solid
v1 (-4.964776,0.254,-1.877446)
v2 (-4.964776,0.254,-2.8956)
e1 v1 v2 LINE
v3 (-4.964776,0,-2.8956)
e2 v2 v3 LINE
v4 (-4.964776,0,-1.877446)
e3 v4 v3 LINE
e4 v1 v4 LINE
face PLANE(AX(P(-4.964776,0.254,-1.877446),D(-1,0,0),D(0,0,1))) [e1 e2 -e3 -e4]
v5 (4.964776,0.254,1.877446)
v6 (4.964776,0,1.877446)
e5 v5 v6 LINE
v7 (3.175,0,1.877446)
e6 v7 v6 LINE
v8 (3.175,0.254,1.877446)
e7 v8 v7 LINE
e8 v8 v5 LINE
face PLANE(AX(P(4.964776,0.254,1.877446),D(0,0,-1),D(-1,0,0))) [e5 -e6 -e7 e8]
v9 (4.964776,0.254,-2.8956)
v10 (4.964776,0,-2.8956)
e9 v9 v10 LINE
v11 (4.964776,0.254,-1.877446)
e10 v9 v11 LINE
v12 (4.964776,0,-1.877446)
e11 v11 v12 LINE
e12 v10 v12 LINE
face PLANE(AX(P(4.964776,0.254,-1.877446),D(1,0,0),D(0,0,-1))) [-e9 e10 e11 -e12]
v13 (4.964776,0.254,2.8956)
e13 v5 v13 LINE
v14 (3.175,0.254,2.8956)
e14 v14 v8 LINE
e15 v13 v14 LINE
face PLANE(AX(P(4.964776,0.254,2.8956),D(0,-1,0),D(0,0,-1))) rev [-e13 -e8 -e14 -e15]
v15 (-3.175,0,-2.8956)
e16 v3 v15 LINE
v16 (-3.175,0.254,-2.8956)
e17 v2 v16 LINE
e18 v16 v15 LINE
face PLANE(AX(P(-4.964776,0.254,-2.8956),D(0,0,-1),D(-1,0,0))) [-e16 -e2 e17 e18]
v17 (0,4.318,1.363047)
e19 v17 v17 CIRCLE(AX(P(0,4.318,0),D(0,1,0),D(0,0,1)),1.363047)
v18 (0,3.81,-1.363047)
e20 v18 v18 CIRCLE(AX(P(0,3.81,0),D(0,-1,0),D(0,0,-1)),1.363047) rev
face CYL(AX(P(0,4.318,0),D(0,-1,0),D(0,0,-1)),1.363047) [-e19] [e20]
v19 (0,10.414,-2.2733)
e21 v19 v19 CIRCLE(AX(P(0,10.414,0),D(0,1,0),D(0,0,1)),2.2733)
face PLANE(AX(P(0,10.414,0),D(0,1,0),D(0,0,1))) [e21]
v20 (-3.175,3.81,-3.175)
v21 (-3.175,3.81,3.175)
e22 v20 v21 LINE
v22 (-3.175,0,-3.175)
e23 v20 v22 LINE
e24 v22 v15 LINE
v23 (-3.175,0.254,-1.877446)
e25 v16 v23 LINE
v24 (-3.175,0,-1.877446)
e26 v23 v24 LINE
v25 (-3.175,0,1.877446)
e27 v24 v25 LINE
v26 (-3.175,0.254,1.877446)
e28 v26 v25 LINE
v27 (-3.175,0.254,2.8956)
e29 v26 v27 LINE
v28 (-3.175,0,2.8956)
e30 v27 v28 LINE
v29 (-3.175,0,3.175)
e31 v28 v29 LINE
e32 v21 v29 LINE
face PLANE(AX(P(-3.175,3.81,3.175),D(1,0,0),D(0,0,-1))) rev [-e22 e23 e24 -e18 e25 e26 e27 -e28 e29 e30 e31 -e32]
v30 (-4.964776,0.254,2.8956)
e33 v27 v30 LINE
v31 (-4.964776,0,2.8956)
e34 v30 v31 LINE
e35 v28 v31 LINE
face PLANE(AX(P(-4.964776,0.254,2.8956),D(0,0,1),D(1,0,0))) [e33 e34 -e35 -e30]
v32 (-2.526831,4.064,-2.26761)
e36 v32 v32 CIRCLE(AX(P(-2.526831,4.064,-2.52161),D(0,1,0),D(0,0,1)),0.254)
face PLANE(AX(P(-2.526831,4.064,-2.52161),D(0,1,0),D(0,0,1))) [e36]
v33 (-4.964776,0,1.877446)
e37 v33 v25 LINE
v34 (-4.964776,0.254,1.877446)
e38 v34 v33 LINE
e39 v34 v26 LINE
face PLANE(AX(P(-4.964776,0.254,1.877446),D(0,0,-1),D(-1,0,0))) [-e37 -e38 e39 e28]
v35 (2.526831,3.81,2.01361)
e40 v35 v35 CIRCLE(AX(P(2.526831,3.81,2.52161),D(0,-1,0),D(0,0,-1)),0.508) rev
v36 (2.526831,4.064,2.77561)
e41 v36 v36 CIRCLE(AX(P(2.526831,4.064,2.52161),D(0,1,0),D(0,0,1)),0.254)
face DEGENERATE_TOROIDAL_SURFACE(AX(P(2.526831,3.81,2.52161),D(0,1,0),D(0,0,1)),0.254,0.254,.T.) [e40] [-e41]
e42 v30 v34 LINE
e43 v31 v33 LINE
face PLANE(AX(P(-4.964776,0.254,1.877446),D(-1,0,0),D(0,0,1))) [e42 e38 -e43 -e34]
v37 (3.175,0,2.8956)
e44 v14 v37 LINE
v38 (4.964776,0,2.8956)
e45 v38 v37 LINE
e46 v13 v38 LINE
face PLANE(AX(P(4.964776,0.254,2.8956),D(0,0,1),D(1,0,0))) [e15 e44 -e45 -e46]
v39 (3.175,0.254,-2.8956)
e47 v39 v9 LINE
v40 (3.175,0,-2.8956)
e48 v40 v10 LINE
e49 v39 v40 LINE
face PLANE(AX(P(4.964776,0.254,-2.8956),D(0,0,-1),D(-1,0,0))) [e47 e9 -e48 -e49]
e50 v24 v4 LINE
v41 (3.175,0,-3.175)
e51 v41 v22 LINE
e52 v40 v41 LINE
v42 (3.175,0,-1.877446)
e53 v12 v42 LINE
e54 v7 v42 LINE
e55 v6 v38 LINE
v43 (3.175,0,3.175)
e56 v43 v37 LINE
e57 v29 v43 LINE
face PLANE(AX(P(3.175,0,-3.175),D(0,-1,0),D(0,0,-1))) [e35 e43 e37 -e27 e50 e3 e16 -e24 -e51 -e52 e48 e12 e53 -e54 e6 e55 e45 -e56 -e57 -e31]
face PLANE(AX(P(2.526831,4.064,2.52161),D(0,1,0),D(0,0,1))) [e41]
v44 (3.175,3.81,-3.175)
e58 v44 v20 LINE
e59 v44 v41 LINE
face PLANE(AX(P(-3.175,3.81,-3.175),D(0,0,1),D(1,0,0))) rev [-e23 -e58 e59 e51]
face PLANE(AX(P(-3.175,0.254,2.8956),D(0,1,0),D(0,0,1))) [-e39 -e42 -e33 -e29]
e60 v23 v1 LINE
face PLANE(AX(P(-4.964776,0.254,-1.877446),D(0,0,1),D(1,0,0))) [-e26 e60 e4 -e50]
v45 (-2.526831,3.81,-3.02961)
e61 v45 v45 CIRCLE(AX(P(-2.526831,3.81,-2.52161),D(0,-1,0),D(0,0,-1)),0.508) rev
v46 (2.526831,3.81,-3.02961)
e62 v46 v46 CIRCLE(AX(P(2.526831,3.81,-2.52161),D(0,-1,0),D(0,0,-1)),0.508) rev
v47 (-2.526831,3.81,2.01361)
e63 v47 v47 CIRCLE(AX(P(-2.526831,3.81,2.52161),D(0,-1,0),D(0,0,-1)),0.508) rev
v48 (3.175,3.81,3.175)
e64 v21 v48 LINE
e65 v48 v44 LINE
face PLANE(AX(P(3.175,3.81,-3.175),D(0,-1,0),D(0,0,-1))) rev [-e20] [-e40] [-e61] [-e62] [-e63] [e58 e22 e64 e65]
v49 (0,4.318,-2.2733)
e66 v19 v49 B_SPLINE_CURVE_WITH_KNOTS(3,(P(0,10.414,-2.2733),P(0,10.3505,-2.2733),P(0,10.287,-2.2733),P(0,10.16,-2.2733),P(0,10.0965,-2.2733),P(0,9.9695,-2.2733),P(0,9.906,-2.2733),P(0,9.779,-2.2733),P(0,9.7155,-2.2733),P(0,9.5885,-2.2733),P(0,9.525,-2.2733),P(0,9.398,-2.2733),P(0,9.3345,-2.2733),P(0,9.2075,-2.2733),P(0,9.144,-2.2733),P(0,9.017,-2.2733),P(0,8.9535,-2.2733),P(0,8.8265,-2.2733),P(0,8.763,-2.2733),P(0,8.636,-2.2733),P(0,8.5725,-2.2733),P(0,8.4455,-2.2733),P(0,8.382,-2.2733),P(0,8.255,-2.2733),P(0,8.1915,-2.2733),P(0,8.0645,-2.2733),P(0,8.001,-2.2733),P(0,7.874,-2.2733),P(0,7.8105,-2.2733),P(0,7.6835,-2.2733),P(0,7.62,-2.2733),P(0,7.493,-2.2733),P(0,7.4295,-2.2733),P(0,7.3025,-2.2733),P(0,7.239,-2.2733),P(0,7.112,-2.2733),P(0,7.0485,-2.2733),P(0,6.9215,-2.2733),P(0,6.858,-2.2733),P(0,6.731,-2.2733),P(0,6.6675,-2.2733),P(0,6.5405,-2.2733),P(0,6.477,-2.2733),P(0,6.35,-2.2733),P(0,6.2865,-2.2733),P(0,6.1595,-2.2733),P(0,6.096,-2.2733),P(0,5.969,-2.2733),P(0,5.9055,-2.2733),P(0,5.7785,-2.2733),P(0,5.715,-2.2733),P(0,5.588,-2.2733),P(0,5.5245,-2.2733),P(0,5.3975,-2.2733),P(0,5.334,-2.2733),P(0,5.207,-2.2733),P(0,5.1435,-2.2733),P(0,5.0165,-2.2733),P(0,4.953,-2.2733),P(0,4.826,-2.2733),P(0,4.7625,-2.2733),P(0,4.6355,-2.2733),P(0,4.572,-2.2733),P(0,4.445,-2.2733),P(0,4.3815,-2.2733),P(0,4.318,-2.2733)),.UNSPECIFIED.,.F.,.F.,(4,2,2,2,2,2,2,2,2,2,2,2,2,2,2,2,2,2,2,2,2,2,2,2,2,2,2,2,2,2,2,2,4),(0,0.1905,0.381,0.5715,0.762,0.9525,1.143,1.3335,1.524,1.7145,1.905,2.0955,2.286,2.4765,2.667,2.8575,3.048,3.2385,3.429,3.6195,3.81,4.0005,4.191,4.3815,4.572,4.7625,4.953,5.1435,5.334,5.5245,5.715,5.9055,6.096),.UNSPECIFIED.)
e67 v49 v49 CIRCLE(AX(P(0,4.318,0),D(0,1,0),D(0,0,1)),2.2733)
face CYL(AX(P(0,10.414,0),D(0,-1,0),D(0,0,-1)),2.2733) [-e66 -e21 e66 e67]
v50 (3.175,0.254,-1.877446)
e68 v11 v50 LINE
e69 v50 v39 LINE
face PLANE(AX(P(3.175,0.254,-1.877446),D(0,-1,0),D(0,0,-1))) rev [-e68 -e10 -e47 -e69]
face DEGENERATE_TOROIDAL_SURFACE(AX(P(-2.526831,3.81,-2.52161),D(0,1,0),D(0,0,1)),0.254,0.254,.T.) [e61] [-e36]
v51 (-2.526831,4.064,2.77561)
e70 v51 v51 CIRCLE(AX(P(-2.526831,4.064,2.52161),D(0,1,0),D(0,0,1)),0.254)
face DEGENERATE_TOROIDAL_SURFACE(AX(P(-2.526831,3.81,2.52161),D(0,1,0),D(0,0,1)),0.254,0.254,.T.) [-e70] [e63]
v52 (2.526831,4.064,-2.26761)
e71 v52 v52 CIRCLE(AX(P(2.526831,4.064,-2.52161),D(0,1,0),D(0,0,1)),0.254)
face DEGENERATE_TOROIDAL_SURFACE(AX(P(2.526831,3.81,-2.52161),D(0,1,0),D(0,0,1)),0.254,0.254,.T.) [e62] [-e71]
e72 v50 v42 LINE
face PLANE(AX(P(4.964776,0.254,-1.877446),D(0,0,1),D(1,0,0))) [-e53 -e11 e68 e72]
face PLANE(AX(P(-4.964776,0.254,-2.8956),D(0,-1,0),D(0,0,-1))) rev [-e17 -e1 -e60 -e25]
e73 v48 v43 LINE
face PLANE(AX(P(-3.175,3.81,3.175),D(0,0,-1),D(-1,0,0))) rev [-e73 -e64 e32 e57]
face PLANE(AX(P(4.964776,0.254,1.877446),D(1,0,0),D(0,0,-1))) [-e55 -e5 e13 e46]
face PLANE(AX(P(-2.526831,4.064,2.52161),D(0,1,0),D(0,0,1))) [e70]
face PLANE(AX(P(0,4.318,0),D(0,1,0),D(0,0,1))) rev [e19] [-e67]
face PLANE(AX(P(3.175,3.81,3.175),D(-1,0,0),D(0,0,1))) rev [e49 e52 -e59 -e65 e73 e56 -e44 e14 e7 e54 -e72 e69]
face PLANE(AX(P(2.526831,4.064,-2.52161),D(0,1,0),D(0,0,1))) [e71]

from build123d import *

# Parameters (mm, degrees)
SKETCH1_W           = 6.35
SKETCH1_H           = 6.35
BOSS_EXTRUDE1_DEPTH = 3.81
SKETCH2_W           = 1.78977558
SKETCH2_H           = 1.018153585
BOSS_EXTRUDE2_DEPTH = 0.254
SKETCH3_R           = 0.508
BOSS_EXTRUDE3_DEPTH = 0.254
FILLET1_R           = 0.254
SKETCH4_R           = 1.363047184
BOSS_EXTRUDE4_DEPTH = 0.508
SKETCH5_R           = 2.2733
BOSS_EXTRUDE5_DEPTH = 6.096


with BuildPart() as part:
    # Sketch1 → Boss-Extrude1 (new body)
    with BuildSketch(Plane(origin=(0, 0, 0), x_dir=(1, 0, 0), z_dir=(0, 1, 0))):
        Rectangle(SKETCH1_W, SKETCH1_H)
    extrude(amount=BOSS_EXTRUDE1_DEPTH)

    # Sketch2 → Boss-Extrude2 (add)
    with BuildSketch(Plane.XZ):
        with Locations((-4.06988779, -2.386523208)):
            Rectangle(SKETCH2_W, SKETCH2_H)
        with Locations((-4.06988779, 2.386523208)):
            Rectangle(SKETCH2_W, SKETCH2_H)
        with Locations((4.06988779, 2.386523208)):
            Rectangle(SKETCH2_W, SKETCH2_H)
        with Locations((4.06988779, -2.386523208)):
            Rectangle(SKETCH2_W, SKETCH2_H)
    extrude(amount=-BOSS_EXTRUDE2_DEPTH)

    # Sketch3 → Boss-Extrude3 (add)
    with BuildSketch(Plane(origin=(0, 3.81, 0), x_dir=(-1, 0, 0), z_dir=(0, 1, 0))):
        with Locations(Location((2.526830598, -2.521609873, 0), (0, 0, 270))):
            Circle(SKETCH3_R)
        with Locations(Location((-2.526830598, -2.521609873, 0), (0, 0, 270))):
            Circle(SKETCH3_R)
        with Locations(Location((-2.526830598, 2.521609873, 0), (0, 0, 270))):
            Circle(SKETCH3_R)
        with Locations(Location((2.526830598, 2.521609873, 0), (0, 0, 270))):
            Circle(SKETCH3_R)
    extrude(amount=BOSS_EXTRUDE3_DEPTH)

    # Fillet1
    fillet1_edges = [part.edges().sort_by_distance(p)[0] for p in [
        (-2.526830598, 4.064, -2.013609873),
        (2.526830598, 4.064, -2.013609873),
        (2.526830598, 4.064, 3.029609873),
        (-2.526830598, 4.064, 3.029609873),
    ]]
    fillet(fillet1_edges, radius=FILLET1_R - 0.0001)  # a hair under: the kernel refuses the full size

    # Sketch4 → Boss-Extrude4 (add)
    with BuildSketch(Plane(origin=(0, 3.81, 0), x_dir=(1, 0, 0), z_dir=(0, 1, 0))):
        with Locations(Location((0, 0, 0), (0, 0, 90))):
            Circle(SKETCH4_R)
    extrude(amount=BOSS_EXTRUDE4_DEPTH)

    # Sketch5 → Boss-Extrude5 (add)
    with BuildSketch(Plane(origin=(0, 4.318, 0), x_dir=(-1, 0, 0), z_dir=(0, 1, 0))):
        with Locations(Location((0, 0, 0), (0, 0, 270))):
            Circle(SKETCH5_R)
    extrude(amount=BOSS_EXTRUDE5_DEPTH)


solid = part.part
